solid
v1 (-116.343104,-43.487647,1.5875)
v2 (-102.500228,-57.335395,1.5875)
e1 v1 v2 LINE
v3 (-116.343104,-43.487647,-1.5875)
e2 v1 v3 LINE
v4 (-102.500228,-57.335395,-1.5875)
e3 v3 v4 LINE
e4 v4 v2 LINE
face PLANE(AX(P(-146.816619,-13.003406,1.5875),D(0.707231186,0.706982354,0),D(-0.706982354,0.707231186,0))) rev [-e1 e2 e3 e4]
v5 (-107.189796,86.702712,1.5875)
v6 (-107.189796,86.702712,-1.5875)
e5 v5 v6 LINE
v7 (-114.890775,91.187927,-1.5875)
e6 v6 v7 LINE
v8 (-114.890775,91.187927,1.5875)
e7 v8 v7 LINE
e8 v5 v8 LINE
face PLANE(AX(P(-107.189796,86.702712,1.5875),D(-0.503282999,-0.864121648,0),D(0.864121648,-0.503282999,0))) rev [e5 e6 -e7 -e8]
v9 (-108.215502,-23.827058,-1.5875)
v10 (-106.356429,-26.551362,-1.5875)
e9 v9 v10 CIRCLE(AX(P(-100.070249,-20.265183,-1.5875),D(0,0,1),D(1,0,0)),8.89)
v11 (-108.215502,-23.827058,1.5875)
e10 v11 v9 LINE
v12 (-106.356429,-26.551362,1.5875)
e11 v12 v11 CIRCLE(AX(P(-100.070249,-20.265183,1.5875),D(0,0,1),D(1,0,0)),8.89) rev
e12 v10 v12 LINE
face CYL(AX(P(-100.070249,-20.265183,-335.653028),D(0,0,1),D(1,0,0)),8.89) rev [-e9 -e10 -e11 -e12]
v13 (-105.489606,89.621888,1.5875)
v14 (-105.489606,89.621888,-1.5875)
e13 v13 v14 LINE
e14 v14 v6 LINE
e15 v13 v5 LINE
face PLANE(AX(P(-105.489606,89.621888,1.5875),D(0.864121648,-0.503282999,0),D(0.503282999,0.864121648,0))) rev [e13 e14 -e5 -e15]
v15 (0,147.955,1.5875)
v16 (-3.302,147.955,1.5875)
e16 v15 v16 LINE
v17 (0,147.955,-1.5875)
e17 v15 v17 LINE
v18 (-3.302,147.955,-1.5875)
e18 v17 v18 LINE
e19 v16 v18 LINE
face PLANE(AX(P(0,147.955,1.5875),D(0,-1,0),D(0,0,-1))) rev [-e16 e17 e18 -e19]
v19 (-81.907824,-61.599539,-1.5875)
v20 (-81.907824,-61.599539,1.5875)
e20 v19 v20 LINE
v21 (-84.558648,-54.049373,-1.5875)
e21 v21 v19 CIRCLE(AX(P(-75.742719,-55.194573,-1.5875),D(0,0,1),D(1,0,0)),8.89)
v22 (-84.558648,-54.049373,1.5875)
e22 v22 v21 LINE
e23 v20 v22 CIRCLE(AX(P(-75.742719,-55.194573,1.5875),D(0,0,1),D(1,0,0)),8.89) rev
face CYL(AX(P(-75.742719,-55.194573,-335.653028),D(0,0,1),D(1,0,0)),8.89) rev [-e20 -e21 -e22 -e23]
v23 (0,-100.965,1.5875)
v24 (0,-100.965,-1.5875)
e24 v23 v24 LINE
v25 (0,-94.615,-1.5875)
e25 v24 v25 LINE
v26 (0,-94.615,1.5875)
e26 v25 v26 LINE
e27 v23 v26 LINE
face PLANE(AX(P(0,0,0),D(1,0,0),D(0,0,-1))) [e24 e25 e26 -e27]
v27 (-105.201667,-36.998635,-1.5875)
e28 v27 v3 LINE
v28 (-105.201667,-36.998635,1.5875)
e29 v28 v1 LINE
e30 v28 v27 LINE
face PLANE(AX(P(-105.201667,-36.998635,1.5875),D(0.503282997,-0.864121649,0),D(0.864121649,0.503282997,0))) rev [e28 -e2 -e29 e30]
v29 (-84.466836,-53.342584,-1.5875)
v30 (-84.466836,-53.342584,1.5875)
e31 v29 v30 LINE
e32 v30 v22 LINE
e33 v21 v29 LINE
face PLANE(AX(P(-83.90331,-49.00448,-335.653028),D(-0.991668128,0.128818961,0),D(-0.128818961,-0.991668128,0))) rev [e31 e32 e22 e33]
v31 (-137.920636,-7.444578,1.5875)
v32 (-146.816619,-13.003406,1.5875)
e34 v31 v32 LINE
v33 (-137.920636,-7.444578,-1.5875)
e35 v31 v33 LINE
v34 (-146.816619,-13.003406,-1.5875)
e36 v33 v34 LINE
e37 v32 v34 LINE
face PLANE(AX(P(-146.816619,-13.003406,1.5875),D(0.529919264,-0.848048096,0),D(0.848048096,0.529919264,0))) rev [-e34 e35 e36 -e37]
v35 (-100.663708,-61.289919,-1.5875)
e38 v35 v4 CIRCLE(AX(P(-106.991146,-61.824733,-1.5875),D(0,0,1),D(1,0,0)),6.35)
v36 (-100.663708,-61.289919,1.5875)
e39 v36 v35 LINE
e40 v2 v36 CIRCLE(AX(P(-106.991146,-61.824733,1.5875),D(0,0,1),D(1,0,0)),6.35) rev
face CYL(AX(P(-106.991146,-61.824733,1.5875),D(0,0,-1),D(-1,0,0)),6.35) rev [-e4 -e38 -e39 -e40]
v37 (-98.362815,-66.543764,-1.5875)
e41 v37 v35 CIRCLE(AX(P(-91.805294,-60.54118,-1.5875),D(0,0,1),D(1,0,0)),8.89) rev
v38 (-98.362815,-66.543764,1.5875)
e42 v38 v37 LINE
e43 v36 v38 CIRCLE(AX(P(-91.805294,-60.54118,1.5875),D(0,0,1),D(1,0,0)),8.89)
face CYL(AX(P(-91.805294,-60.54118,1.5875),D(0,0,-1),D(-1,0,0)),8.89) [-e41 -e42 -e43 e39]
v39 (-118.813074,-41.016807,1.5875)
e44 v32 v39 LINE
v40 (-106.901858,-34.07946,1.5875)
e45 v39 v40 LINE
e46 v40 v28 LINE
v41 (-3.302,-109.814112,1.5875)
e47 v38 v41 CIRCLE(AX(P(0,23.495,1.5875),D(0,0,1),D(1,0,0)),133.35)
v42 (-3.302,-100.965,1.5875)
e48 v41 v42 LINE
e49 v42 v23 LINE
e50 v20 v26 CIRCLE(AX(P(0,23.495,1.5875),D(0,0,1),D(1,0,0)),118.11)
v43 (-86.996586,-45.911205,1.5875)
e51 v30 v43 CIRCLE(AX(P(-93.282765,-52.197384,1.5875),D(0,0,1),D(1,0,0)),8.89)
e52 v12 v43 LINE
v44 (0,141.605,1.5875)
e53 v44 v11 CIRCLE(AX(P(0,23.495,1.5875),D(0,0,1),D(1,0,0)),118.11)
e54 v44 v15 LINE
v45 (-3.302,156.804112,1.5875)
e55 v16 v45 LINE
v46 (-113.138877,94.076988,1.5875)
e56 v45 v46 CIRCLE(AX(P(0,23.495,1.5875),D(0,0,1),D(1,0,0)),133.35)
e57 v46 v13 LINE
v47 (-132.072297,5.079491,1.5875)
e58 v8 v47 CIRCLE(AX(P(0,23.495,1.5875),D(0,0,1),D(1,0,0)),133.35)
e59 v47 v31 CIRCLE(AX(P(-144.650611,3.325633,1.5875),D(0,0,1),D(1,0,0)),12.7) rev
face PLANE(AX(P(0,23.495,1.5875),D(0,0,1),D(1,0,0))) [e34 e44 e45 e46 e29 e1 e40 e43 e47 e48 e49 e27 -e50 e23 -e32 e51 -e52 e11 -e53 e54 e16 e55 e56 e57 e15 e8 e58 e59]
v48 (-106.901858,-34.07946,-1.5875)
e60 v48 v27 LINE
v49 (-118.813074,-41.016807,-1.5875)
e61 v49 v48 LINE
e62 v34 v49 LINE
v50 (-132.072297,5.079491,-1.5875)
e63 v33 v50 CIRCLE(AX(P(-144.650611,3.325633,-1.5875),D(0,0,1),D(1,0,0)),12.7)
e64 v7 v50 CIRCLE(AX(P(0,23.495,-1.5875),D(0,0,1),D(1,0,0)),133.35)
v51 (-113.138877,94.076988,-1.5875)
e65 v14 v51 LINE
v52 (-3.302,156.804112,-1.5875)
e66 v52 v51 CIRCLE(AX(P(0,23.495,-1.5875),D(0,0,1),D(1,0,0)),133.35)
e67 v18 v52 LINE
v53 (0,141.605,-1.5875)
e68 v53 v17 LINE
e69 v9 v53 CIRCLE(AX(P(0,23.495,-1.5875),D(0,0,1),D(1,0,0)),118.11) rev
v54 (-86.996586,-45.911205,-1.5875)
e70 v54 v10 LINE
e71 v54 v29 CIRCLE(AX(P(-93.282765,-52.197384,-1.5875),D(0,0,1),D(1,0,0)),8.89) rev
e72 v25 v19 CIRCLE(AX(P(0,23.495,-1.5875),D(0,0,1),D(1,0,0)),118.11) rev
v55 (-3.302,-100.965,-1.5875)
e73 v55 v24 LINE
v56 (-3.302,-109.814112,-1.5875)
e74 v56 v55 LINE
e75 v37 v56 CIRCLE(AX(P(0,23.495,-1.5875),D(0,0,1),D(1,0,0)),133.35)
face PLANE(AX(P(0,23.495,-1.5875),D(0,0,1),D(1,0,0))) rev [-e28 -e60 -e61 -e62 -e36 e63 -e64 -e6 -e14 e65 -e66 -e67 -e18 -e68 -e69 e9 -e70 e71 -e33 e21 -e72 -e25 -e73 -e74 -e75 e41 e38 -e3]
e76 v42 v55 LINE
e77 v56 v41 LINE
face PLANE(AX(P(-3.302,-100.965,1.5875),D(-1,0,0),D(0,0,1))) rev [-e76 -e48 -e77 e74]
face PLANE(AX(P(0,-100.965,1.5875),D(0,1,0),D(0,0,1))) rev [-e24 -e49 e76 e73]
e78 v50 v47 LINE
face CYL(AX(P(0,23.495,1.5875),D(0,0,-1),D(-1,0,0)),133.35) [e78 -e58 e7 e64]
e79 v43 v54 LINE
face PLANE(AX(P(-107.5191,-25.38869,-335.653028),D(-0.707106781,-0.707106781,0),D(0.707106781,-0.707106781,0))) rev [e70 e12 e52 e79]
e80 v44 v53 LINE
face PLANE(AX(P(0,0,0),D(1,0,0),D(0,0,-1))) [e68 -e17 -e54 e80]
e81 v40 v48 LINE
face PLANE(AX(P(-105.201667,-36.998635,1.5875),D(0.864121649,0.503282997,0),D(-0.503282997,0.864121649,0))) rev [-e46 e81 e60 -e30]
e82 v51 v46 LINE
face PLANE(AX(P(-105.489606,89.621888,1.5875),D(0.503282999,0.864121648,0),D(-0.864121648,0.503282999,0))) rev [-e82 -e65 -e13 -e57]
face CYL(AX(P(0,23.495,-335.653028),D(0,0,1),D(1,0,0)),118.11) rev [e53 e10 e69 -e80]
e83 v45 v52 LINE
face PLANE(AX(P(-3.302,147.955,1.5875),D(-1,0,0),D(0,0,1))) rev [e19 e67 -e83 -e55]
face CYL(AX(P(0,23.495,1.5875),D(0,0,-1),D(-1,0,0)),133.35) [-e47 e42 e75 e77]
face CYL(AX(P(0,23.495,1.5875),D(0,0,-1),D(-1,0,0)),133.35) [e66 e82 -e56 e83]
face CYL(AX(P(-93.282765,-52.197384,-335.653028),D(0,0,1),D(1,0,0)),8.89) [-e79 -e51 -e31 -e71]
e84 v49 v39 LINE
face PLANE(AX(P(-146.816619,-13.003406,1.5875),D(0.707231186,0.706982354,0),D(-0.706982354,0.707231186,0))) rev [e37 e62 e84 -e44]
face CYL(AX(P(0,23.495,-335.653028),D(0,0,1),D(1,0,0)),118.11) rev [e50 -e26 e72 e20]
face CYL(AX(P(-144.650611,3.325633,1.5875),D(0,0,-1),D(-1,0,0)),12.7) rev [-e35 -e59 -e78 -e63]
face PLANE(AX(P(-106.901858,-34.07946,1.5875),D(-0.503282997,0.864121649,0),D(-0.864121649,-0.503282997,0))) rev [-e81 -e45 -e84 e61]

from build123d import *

# Parameters (mm, degrees)
BOSS_EXTRUDE1_DEPTH = 1.5875
CUT_EXTRUDE1_DEPTH  = 3.175
FILLET1_R           = 8.89
SKETCH3_W           = 234.443386257
SKETCH3_H           = 422.563019086
CUT_EXTRUDE2_DEPTH  = 206.876411182
BOSS_EXTRUDE2_DEPTH = 1.5875
FILLET2_R           = 6.35
FILLET3_R           = 12.7
SKETCH6_W           = 3.302
SKETCH6_H           = 12.7
CUT_EXTRUDE3_DEPTH  = 215.861709895


with BuildPart() as part:
    # Sketch1 → Boss-Extrude1 (new, symmetric)
    with BuildSketch(Plane.XY):
        with BuildLine():
            Line((-120.187952283, -34.272453), (-99.98237601, -54.478029272))
            Line((-99.98237601, -54.478029272), (-101.142590553, -63.40953887))
            ThreePointArc((-101.142590553, -63.40953887), (-81.179103762, -82.298079227), (-57.767453, -96.692952283))
            ThreePointArc((-57.767453, -96.692952283), (94.292689271, 117.787689271), (-120.187952283, -34.272453))
        make_face()
    extrude(amount=BOSS_EXTRUDE1_DEPTH, both=True)

    # Sketch2 → Cut-Extrude1 (cut)
    with BuildSketch(Plane.XY.offset(1.5875)):
        with BuildLine():
            Line((-83.903310386, -49.004480206), (-85.12178765, -58.384505172))
            ThreePointArc((-85.12178765, -58.384505172), (97.723123527, 89.828726174), (-107.51910025, -25.388690342))
            Line((-107.51910025, -25.388690342), (-83.903310386, -49.004480206))
        make_face()
    extrude(amount=-CUT_EXTRUDE1_DEPTH, mode=Mode.SUBTRACT)

    # Fillet1
    fillet1_edges = [part.edges().sort_by_distance(p)[0] for p in [
        (-83.903310386, -49.004480206, 0),
        (-107.51910025, -25.388690342, 0),
        (-85.12178765, -58.384505172, 0),
        (-99.98237601, -54.478029272, -0.79375),
        (-120.187952283, -34.272453, -0.79375),
        (-101.142590553, -63.40953887, -0.79375),
    ]]
    fillet(fillet1_edges, radius=FILLET1_R)

    # Sketch3 → Cut-Extrude2 (cut, through all)
    with BuildSketch(Plane(origin=(0, 0, 0), x_dir=(0, 0, -1), z_dir=(1, 0, 0))):
        with Locations((10.168628802, 16.433452221)):
            Rectangle(SKETCH3_W, SKETCH3_H)
    extrude(amount=CUT_EXTRUDE2_DEPTH, mode=Mode.SUBTRACT)

    # Sketch5 → Boss-Extrude2 (add, symmetric)
    with BuildSketch(Plane.XY):
        Polygon((-146.81661939, -13.003405573), (-125.293457687, 0.445758531), (-91.969146245, -50.60762416), (-100.600425128, -59.235866221), align=None)
    extrude(amount=BOSS_EXTRUDE2_DEPTH, both=True)

    # Fillet2
    # the kernel refuses this fillet: 6.35 mm, written as the material it adds along each edge
    with BuildSketch(Plane(origin=(-100.600425128, -59.235866221, -1.5875), x_dir=(-0.03079411224323655, -0.9995257488685076, 0), z_dir=(0, 0, 1)), Plane(origin=(-100.600425128, -59.235866221, 0), x_dir=(-0.03079411224323655, -0.9995257488685076, 0), z_dir=(0, 0, 1))) as fillet2_piece_1:
        with BuildLine():
            CenterArc((2.784435169, -6.30796831), FILLET2_R, 96.595975588, 40.158594829)
            Line((-1.841067542, -1.957425279), (-2.303617813, -1.522370976))
            Line((-2.303617813, -1.522370976), (-0.462550271, 0.435054303))
            Line((-0.462550271, 0.435054303), (0.062369909, 0.63192958))
            ThreePointArc((0.062369909, 0.63192958), (0.223047541, 0.61607109), (1.982086545, 0.630796831))
            Line((1.982086545, 0.630796831), (2.055027329, 0))
        make_face()
    extrude(amount=1.5875)

    # Fillet3
    fillet3_edges = [part.edges().sort_by_distance(p)[0] for p in [
        (-130.70446004, -2.935411002, 0),
    ]]
    fillet(fillet3_edges, radius=FILLET3_R)

    # Sketch6 → Cut-Extrude3 (cut, through all)
    with BuildSketch(Plane(origin=(0, 0, -1.5875), x_dir=(-1, 0, 0), z_dir=(0, 0, -1))):
        with Locations((1.651, 154.305)):
            Rectangle(SKETCH6_W, SKETCH6_H)
        Polygon((105.489605782, 89.621888205), (107.18979641, 86.702712453), (118.164141341, 93.094406542), (116.463950713, 96.013582294), align=None)
        Polygon((105.201667309, -36.998635355), (106.90185793, -34.079459599), (128.850547824, -46.862847722), (127.150357204, -49.782023478), align=None)
        with Locations((1.651, -107.315)):
            Rectangle(SKETCH6_W, SKETCH6_H)
    extrude(amount=-CUT_EXTRUDE3_DEPTH, mode=Mode.SUBTRACT)


solid = part.part
